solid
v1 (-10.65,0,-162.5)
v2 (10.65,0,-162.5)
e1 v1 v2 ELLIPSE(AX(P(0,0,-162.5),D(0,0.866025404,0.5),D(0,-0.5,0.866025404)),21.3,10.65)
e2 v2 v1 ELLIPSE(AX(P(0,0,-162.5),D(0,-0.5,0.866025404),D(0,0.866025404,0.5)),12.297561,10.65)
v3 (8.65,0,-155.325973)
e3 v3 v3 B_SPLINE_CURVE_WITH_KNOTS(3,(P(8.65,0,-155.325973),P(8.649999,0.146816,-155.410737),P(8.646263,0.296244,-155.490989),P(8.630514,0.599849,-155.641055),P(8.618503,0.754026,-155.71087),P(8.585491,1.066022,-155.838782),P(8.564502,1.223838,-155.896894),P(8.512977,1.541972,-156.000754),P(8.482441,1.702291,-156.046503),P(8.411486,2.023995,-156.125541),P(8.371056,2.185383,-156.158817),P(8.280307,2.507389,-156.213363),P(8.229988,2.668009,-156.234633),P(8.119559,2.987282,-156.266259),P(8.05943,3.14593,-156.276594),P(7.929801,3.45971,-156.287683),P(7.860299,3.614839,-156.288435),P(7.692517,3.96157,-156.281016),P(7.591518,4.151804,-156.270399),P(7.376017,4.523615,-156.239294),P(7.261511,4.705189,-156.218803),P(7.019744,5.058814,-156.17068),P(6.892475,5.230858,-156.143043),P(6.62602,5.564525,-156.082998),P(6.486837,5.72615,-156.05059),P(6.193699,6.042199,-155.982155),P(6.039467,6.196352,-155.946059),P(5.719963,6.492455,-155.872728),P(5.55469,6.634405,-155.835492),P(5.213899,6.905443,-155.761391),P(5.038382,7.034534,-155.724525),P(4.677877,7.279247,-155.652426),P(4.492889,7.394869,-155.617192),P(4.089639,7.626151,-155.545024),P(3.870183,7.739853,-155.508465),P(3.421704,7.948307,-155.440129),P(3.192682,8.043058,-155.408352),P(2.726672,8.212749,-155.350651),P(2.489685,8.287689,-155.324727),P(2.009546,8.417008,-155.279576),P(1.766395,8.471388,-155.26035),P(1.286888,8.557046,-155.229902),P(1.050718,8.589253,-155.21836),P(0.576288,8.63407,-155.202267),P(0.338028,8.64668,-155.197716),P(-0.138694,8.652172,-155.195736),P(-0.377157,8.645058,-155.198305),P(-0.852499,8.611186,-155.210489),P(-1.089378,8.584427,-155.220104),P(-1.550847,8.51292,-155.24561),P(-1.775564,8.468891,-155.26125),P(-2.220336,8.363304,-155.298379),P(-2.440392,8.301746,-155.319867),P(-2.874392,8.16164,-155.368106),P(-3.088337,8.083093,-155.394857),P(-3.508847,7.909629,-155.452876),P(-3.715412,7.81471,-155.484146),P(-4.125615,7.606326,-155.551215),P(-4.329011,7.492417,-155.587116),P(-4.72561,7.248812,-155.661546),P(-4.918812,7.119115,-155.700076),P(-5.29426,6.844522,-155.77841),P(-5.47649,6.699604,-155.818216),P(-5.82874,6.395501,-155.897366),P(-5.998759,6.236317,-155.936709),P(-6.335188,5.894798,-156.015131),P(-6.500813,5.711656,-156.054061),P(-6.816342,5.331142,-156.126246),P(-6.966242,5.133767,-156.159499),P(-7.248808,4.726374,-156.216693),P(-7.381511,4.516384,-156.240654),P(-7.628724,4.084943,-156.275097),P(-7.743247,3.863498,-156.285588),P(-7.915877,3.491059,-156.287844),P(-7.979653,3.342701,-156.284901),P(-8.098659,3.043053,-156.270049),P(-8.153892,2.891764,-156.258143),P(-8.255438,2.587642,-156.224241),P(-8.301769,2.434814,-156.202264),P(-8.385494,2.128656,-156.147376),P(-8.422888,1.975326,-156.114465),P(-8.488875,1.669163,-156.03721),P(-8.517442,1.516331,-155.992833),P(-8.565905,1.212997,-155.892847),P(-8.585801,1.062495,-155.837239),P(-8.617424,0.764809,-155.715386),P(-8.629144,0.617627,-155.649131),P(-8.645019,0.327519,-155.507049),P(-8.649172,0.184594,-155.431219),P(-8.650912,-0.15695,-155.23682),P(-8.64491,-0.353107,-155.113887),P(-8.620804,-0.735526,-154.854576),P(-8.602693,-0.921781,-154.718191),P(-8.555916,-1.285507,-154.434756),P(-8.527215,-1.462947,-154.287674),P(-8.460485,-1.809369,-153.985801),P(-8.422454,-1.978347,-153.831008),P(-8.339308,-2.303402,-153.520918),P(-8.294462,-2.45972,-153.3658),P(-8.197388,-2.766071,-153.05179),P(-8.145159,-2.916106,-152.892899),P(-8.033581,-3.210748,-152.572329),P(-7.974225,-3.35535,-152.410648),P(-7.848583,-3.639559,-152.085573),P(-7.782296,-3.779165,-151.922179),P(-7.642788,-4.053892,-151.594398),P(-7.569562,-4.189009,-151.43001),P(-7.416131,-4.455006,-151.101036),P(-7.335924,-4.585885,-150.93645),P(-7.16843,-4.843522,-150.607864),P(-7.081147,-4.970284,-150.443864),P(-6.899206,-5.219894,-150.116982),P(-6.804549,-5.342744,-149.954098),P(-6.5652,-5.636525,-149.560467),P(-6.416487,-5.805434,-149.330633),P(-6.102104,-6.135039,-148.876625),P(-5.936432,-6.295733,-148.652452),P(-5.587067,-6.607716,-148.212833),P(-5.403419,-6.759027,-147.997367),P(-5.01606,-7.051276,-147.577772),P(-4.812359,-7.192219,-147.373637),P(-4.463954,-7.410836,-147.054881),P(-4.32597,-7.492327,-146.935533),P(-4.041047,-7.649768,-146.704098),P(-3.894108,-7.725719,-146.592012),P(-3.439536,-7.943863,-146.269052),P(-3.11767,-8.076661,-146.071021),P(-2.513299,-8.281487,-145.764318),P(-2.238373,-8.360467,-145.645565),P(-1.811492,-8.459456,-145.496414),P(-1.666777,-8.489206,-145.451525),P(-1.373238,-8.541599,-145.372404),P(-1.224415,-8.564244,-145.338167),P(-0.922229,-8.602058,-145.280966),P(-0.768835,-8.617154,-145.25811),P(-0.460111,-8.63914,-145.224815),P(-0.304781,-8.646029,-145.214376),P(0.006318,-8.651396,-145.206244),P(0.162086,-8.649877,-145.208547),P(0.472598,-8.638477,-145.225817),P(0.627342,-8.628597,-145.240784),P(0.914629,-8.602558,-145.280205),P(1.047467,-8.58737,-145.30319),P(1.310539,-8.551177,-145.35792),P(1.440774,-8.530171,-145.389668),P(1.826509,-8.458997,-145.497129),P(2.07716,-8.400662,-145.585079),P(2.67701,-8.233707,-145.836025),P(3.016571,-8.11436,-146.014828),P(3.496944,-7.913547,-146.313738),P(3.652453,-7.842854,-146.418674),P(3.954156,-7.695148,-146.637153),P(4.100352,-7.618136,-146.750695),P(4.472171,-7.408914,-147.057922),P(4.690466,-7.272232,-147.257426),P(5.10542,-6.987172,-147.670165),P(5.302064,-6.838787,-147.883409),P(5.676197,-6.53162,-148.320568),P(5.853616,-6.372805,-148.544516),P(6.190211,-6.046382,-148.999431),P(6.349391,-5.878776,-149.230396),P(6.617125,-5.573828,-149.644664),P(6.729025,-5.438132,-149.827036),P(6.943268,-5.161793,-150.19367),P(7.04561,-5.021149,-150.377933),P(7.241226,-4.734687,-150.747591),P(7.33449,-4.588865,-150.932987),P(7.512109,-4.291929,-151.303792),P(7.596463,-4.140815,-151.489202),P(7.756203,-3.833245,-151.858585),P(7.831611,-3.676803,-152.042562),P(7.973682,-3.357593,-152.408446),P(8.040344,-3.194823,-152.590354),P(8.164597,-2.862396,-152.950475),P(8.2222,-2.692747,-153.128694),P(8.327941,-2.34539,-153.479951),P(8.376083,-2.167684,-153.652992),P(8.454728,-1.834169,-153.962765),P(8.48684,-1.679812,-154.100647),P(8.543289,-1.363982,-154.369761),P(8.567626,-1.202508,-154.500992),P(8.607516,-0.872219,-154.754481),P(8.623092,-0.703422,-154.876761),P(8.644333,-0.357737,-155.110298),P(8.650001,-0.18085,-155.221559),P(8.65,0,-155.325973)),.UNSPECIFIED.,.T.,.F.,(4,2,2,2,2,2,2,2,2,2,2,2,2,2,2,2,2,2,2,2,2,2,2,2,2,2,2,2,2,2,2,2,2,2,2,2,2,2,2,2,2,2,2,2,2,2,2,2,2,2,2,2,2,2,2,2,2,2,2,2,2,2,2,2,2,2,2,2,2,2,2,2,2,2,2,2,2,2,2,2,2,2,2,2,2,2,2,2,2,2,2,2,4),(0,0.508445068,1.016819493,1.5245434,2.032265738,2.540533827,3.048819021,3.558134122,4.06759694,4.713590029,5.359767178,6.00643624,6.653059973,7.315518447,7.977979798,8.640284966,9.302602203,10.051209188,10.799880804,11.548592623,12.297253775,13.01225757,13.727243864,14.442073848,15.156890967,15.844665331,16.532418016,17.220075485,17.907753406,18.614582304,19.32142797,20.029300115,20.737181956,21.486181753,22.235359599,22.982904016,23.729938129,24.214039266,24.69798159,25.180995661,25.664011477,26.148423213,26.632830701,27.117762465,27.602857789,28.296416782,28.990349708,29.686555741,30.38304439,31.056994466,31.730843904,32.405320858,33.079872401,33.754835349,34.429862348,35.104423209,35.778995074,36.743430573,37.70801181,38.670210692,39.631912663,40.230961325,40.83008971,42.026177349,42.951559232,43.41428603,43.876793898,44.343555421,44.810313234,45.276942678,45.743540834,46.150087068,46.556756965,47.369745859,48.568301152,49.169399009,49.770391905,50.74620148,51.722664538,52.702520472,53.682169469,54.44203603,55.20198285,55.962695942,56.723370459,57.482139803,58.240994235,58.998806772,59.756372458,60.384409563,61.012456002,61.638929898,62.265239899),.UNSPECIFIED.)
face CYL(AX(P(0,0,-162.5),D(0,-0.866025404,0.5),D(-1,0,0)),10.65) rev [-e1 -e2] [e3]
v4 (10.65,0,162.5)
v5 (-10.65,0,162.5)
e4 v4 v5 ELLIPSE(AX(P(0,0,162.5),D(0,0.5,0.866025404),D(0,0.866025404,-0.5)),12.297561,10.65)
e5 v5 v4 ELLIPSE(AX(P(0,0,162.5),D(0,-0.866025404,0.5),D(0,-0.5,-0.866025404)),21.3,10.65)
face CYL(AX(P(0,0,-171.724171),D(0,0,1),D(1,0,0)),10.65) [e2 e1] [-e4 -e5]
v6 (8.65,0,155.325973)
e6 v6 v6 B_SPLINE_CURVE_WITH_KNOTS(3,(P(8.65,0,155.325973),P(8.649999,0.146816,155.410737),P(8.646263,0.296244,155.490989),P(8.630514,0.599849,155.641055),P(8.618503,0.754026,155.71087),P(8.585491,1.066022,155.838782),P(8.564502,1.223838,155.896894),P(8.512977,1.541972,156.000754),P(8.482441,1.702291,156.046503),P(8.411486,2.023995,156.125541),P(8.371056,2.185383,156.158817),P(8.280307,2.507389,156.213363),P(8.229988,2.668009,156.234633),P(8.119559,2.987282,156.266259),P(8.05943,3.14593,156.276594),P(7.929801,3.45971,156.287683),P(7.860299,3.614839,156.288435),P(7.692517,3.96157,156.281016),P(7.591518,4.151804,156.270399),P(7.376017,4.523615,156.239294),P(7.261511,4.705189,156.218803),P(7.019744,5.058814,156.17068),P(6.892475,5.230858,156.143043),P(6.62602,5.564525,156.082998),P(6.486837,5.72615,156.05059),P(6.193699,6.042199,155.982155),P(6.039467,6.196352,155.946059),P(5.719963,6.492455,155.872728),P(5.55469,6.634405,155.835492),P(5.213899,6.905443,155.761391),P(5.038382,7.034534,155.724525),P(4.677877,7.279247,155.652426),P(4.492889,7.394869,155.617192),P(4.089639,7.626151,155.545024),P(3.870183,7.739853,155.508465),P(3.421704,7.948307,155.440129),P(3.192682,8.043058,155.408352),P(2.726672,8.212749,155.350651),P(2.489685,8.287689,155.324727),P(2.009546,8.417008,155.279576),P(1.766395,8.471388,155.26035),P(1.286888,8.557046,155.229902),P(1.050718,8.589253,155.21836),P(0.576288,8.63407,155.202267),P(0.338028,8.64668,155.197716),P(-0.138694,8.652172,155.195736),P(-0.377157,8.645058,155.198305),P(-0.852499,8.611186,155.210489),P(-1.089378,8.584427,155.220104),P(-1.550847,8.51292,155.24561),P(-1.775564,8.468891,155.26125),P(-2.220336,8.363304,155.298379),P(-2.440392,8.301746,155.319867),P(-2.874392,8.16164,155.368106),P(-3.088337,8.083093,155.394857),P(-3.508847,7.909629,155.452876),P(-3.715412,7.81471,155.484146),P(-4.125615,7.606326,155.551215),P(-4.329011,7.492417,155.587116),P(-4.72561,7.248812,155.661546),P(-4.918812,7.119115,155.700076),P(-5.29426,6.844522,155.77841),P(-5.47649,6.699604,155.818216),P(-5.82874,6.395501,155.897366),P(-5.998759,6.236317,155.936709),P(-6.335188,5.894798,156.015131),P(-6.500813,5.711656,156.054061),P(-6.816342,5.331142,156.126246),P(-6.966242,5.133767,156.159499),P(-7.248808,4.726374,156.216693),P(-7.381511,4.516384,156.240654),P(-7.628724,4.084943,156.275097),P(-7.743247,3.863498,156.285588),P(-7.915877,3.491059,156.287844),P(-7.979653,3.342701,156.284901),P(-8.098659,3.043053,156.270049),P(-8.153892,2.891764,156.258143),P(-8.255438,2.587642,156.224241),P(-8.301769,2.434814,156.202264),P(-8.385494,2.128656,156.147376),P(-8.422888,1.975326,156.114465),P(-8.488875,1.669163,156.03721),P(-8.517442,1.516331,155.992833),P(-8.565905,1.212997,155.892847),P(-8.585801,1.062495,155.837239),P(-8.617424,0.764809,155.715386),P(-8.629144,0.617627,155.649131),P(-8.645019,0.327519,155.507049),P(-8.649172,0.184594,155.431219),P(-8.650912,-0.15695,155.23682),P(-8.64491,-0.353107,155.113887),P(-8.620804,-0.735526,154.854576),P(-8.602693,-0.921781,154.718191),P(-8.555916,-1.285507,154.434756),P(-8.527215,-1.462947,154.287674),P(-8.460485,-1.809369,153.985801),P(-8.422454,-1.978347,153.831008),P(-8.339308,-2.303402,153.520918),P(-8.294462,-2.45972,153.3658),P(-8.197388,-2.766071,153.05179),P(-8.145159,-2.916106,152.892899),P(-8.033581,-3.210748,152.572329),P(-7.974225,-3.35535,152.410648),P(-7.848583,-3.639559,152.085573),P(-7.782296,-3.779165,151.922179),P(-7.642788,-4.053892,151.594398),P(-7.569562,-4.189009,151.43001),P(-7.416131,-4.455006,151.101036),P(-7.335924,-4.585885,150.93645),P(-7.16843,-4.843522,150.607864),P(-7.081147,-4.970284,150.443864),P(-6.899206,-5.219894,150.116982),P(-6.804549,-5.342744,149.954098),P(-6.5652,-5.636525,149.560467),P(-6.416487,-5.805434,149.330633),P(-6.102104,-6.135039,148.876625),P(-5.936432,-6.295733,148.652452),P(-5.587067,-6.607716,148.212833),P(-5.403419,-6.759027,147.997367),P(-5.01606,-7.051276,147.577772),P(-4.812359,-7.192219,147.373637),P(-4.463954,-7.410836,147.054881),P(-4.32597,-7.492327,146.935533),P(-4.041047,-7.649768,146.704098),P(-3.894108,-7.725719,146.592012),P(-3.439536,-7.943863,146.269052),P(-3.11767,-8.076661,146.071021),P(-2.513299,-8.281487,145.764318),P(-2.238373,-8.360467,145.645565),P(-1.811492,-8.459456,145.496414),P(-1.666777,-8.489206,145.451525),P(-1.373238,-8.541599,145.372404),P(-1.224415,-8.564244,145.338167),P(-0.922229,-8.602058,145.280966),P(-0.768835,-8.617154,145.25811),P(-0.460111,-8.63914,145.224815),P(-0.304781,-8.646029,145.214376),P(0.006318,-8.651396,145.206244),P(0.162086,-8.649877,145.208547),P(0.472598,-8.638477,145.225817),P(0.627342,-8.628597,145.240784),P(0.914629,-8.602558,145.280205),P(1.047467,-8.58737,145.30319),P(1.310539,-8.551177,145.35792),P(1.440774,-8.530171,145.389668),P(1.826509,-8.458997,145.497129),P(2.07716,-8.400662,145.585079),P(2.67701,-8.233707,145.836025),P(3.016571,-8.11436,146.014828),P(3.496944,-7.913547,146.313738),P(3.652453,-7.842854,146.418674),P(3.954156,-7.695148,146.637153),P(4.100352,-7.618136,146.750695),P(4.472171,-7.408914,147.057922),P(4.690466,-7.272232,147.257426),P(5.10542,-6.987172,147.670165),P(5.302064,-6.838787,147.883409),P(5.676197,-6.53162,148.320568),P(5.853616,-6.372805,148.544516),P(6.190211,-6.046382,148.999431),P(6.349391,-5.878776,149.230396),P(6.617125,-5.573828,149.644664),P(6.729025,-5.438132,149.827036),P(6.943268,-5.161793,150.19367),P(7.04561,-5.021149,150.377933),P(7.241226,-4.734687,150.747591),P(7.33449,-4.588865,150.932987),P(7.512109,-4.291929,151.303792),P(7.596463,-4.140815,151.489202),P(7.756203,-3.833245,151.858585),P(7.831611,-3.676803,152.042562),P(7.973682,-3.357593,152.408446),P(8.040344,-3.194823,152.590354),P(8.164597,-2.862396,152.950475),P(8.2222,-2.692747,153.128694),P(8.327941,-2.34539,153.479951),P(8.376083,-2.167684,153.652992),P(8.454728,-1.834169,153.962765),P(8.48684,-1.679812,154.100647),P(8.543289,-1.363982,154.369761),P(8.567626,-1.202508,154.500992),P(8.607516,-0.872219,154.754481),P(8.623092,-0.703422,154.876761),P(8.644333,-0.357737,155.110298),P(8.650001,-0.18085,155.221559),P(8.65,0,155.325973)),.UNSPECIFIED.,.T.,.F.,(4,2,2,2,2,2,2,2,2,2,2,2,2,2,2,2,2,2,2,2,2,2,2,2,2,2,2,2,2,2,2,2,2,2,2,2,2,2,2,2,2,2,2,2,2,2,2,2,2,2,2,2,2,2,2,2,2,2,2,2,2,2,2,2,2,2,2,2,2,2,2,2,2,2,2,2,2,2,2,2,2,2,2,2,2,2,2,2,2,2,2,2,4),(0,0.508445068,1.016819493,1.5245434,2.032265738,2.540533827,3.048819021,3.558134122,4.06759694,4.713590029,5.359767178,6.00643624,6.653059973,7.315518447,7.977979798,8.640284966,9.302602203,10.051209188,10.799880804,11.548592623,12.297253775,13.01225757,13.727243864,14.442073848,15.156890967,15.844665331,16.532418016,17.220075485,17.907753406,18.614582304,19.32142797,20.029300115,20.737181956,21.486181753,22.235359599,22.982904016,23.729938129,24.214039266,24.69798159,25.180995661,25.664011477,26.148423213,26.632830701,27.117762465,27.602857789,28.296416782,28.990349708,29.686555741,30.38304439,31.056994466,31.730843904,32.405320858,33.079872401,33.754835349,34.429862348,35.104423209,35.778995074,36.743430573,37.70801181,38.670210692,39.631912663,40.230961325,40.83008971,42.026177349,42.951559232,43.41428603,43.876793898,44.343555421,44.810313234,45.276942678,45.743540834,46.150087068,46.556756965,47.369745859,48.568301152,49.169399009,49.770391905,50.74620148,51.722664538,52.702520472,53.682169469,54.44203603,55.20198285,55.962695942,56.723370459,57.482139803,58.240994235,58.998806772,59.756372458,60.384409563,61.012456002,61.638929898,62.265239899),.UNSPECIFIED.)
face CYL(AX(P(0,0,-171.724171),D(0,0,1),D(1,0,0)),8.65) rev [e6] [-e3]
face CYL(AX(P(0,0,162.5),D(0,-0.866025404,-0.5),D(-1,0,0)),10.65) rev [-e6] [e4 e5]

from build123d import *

# Parameters (mm, degrees)
EXTRUDE_START           = -144.053658799
EXTRUDE_1_OUTLINE_R     = 10.65
EXTRUDE_1_OUTLINE_R_2   = 8.65
EXTRUDE_1_DEPTH         = 144.053658799
EXTRUDE_START_2         = -162.5000001
EXTRUDE_1_2_OUTLINE_R   = 10.65
EXTRUDE_1_2_OUTLINE_R_2 = 8.65
EXTRUDE_1_2_DEPTH       = 18.446341301
EXTRUDE_START_3         = -9.22317055
EXTRUDE_1_3_DEPTH       = 100.22317055


with BuildPart() as part:
    # Бобышка-Вытянуть1: read off the stored shape, not the designer's step
    # Бобышка-Вытянуть1 outline → Бобышка-Вытянуть1 (new body)
    with BuildSketch(Plane.XY.offset(EXTRUDE_START)):
        Circle(EXTRUDE_1_OUTLINE_R)
        Circle(EXTRUDE_1_OUTLINE_R_2, mode=Mode.SUBTRACT)
    extrude(amount=EXTRUDE_1_DEPTH)

    # Extrude 1 2 outline → Extrude 1 2 (add)
    with BuildSketch(Plane.XY.offset(EXTRUDE_START_2)):
        Circle(EXTRUDE_1_2_OUTLINE_R)
        Circle(EXTRUDE_1_2_OUTLINE_R_2, mode=Mode.SUBTRACT)
    extrude(amount=EXTRUDE_1_2_DEPTH)

    # Extrude 1 3 outline → Extrude 1 3 (cut)
    with BuildSketch(Plane(origin=(0, 0, 0), x_dir=(1, 0, 0), z_dir=(0, 0.8660254037845098, -0.4999999999998769)).offset(EXTRUDE_START_3)):
        with BuildLine():
            ThreePointArc((-10.65, 140.729128115), (0, 130.079128115), (10.65, 140.729128115))
            Line((10.65, 140.729128115), (10.65, 148))
            Line((10.65, 148), (-10.65, 148))
            Line((-10.65, 148), (-10.65, 140.729128115))
        make_face()
    extrude(amount=EXTRUDE_1_3_DEPTH, mode=Mode.SUBTRACT)

    # Зеркальное отражение1: part across plane


with BuildPart() as part_1:
    add(part.part)
    add(part.part.mirror(Plane.XY))


solid = part_1.part
